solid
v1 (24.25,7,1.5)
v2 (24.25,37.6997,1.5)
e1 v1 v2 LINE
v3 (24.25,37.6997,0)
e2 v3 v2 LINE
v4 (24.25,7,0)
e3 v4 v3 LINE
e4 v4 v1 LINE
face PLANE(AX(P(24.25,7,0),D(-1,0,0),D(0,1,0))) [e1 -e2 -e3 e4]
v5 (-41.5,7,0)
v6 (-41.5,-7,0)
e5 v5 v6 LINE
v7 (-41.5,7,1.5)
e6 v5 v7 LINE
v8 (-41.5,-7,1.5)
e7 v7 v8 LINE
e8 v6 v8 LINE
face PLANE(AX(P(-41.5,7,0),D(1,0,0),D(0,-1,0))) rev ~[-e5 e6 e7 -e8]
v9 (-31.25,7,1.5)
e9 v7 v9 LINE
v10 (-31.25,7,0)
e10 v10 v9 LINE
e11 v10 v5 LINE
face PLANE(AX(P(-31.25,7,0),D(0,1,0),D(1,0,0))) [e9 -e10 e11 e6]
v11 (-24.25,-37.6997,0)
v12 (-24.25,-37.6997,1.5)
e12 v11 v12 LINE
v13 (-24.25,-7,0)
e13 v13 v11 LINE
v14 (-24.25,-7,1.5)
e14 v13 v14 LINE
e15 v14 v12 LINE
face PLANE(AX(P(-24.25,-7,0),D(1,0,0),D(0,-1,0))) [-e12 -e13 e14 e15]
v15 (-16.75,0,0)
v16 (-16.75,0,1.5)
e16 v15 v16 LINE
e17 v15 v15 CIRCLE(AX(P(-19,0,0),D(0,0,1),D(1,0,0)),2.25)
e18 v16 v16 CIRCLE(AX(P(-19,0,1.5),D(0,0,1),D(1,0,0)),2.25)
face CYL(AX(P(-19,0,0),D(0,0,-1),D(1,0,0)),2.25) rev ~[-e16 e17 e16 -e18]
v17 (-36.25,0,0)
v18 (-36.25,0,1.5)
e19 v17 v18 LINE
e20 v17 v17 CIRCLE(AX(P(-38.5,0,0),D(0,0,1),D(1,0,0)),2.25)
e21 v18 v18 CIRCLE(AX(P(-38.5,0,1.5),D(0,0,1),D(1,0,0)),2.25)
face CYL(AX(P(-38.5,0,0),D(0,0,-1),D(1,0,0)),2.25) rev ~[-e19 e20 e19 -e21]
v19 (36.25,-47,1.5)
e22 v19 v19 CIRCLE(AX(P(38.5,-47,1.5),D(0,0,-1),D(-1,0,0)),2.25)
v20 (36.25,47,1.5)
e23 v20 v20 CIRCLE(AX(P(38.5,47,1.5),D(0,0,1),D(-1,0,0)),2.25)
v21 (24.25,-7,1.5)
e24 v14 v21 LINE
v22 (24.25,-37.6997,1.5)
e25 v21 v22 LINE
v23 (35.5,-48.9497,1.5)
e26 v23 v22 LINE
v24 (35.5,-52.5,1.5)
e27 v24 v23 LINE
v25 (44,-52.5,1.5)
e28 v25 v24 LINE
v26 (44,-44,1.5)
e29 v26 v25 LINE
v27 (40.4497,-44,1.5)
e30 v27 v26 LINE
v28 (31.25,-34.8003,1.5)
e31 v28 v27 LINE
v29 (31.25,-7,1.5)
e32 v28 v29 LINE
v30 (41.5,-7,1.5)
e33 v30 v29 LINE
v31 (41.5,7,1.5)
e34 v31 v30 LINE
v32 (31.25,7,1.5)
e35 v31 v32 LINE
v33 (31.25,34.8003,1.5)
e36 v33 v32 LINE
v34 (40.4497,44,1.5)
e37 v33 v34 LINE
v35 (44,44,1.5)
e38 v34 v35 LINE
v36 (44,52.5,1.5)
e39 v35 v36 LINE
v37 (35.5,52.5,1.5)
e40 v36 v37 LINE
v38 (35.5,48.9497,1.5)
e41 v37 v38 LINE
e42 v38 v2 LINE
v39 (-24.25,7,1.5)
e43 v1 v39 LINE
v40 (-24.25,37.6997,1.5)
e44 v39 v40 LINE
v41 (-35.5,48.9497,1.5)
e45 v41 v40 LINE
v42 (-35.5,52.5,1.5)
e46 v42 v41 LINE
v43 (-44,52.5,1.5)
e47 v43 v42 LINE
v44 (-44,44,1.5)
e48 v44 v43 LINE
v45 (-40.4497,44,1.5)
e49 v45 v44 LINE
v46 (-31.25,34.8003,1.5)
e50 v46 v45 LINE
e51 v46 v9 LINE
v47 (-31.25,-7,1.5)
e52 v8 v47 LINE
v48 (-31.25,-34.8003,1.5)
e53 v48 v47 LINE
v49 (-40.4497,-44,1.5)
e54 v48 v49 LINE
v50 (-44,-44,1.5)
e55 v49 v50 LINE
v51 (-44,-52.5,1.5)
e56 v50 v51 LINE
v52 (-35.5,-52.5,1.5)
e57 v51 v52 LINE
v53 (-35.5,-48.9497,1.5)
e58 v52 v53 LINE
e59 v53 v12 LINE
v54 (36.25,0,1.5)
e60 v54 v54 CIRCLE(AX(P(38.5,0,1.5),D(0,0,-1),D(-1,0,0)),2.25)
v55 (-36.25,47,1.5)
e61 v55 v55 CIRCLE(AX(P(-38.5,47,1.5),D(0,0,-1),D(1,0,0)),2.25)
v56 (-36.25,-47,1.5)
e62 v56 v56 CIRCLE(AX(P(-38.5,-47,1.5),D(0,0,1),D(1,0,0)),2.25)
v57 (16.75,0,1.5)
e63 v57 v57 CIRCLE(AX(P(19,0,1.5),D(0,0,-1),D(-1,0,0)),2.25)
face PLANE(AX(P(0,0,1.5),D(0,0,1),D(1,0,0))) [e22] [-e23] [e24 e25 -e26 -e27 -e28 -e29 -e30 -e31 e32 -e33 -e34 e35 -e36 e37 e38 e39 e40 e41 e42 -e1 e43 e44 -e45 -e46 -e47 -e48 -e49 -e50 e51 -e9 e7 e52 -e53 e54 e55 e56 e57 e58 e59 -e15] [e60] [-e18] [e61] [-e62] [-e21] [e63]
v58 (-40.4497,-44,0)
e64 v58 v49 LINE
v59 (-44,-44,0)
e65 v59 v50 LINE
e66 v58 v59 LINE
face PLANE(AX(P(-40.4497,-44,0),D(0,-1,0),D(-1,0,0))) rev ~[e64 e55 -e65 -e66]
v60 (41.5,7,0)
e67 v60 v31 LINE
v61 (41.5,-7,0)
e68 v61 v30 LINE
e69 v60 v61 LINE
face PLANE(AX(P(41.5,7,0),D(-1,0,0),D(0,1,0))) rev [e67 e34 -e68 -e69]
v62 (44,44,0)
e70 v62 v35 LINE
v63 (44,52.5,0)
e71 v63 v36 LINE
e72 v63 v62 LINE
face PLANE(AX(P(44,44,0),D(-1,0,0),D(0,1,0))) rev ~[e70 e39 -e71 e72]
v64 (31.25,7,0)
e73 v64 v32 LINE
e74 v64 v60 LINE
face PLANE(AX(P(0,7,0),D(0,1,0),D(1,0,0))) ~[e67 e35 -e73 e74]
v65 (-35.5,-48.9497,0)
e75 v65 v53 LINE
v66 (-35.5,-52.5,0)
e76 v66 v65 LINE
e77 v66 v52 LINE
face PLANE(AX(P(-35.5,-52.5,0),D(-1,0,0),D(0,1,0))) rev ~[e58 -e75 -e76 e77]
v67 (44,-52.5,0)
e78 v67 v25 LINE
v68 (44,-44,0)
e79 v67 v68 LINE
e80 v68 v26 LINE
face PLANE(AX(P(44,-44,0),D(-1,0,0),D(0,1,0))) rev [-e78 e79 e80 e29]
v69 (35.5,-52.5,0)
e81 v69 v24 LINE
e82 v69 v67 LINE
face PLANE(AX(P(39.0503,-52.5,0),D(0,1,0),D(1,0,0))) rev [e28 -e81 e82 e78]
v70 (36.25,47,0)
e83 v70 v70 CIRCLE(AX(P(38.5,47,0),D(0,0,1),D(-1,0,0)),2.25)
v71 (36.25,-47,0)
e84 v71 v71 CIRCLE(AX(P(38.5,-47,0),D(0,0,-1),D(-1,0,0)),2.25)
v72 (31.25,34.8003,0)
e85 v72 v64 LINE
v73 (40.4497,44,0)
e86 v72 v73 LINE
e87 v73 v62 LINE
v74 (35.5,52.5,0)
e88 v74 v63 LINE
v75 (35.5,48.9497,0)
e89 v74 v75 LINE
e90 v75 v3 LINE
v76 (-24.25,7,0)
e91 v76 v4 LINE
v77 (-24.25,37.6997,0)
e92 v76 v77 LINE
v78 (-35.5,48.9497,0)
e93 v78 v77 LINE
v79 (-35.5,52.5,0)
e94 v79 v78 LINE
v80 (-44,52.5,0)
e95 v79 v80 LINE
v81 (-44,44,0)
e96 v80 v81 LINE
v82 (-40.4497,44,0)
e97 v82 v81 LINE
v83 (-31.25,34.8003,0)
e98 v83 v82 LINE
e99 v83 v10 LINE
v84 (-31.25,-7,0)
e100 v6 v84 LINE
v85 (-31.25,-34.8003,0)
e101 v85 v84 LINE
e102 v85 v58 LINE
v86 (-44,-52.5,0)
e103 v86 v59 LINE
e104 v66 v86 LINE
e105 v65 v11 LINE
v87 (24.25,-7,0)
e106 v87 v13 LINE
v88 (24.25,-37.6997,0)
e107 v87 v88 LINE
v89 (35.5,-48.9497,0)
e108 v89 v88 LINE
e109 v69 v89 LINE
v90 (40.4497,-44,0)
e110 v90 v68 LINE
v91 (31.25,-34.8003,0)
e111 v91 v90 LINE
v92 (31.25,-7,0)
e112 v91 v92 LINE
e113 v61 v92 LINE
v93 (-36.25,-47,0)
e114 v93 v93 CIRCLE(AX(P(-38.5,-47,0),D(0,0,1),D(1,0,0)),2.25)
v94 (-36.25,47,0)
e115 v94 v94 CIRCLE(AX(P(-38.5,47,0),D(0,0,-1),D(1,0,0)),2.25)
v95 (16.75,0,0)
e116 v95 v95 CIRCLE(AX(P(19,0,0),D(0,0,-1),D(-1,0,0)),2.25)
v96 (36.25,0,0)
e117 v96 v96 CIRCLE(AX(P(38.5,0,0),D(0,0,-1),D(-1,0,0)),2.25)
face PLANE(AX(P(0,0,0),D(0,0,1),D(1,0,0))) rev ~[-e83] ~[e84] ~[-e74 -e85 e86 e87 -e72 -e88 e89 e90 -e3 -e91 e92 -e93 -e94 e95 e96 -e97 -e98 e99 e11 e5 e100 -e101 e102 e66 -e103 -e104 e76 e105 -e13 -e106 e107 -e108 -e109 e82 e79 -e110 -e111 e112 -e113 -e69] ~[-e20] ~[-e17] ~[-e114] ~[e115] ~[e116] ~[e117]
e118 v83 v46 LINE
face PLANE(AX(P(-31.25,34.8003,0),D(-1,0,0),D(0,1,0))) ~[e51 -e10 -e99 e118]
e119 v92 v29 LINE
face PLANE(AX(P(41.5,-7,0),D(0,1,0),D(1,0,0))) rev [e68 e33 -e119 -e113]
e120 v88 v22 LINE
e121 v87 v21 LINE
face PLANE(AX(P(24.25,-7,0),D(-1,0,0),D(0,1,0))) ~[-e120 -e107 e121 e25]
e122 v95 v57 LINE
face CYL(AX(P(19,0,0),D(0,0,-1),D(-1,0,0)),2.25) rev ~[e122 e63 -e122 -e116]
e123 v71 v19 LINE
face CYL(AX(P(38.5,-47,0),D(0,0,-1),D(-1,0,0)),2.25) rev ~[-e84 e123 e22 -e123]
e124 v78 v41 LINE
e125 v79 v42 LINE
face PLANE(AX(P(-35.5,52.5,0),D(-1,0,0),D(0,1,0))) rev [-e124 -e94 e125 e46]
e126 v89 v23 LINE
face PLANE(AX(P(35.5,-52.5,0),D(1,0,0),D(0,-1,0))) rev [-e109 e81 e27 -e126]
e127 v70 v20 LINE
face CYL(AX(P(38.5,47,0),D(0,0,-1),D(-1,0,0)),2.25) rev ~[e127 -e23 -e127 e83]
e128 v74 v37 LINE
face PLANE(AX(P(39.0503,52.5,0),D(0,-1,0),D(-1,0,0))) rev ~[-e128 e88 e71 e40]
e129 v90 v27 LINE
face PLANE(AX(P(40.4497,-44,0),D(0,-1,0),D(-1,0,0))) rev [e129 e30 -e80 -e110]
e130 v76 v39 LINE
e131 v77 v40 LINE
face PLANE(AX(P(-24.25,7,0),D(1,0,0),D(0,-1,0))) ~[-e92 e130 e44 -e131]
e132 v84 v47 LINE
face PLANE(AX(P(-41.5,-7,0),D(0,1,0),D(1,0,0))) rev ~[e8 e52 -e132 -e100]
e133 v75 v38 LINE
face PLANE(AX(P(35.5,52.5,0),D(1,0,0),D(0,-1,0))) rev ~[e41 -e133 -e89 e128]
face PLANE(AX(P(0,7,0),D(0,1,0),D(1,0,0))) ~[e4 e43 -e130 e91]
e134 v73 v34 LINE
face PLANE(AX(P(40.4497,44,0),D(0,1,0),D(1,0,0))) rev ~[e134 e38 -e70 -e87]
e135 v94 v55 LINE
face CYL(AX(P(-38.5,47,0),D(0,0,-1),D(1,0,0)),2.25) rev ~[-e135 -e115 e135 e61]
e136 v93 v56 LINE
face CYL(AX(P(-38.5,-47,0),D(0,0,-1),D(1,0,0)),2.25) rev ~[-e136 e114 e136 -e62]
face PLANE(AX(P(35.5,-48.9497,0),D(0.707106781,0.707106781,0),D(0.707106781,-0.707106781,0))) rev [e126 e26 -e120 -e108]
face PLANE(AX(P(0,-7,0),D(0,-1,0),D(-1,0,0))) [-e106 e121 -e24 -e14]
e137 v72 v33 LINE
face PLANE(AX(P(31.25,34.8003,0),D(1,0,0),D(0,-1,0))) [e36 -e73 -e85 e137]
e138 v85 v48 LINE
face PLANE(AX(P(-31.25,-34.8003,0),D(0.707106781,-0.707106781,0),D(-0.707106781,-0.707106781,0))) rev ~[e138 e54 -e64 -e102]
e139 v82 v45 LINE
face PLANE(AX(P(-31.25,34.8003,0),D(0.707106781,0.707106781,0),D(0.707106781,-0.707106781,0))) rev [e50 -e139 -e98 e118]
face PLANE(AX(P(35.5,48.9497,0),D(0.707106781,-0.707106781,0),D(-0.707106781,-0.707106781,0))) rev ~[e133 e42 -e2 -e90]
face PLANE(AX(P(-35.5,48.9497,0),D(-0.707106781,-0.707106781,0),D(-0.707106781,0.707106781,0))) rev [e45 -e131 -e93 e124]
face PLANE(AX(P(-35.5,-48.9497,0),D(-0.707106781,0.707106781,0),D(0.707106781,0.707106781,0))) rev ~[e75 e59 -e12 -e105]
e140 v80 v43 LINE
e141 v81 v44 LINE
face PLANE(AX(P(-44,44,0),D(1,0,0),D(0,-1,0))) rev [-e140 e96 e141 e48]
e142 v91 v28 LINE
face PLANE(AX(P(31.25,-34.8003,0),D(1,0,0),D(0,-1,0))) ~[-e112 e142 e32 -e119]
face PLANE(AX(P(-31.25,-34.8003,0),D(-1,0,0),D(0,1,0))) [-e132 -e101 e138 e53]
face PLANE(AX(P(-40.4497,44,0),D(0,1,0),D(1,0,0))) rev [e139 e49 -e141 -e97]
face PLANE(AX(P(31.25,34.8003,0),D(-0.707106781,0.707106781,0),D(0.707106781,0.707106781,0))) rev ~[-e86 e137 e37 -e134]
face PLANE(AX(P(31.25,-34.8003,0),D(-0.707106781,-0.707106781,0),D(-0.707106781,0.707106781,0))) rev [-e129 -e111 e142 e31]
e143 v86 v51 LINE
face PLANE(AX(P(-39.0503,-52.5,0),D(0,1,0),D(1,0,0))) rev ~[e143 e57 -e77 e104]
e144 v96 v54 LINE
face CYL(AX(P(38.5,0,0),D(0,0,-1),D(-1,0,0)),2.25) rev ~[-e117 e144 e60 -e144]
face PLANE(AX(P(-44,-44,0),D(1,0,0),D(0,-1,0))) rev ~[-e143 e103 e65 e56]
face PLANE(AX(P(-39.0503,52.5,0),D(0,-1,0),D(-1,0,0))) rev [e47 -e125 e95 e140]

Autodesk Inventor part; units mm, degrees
ref_plane "YZ Plane" through (0, 0, 0) normal (1, 0, 0) x (0, 1, 0)
ref_plane "XZ Plane" through (0, 0, 0) normal (0, 1, 0) x (-1, 0, 0)
ref_plane "XY Plane" through (0, 0, 0) normal (0, 0, 1) x (1, 0, 0)
sketch "Sketch1" plane through (0, 0, 0) normal (0, 0, 1) x (1, 0, 0)
  line L0 (-41.5, 50) -> (41.5, 50) construction
  line L1 (41.5, 50) -> (41.5, -50) construction
  line L2 (41.5, -50) -> (-41.5, -50) construction
  line L3 (-41.5, -50) -> (-41.5, 50) construction
  line L4 (0, 52.1292) -> (0, -48.3366) construction
  line L5 (-75.7124, 0) -> (96.9256, 0) construction
  circle A0 centre (-38.5, 47) radius 2.25
  line L6 (-31.25, 7) -> (0, 7)
  line L7 (0, 7) -> (0, -7)
  line L8 (0, -7) -> (-31.25, -7)
  line L9 (-31.25, -7) -> (-31.25, 7)
  circle A1 centre (-19, 0) radius 2.25
  line L10 (38.5, 47) -> (-38.5, 47) construction
  line L11 (-38.5, 47) -> (-38.5, -47) construction
  line L12 (-38.5, -47) -> (38.5, -47) construction
  line L13 (38.5, -47) -> (38.5, 47) construction
  circle A2 centre (38.5, 47) radius 2.25
  circle A3 centre (38.5, -47) radius 2.25
  circle A4 centre (-38.5, -47) radius 2.25
  line L14 (-31.25, -7) -> (-24.25, -7)
  line L15 (-24.25, -7) -> (-24.25, -37.6997)
  line L16 (-24.25, -37.6997) -> (-31.25, -37.6997)
  line L17 (-31.25, -37.6997) -> (-31.25, -7)
  line L18 (-44, -47.5503) -> (-39.0503, -52.5)
  line L19 (-39.0503, -52.5) -> (-24.25, -37.6997)
  line L20 (-24.25, -37.6997) -> (-29.1997, -32.75)
  line L21 (-29.1997, -32.75) -> (-44, -47.5503)
  line L22 (-26.7249, -35.2249) -> (-41.5251, -50.0251) construction
  line L23 (-41.5, -50) -> (-10.8193, -19.3193) construction
  line L24 (-41.5, -50) -> (1.8891, -50) construction
  line L25 (-35.5, -44) -> (-44, -44)
  line L26 (-44, -44) -> (-44, -52.5)
  line L27 (-44, -52.5) -> (-35.5, -52.5)
  line L28 (-35.5, -52.5) -> (-35.5, -44)
  circle A5 centre (-38.5, 0) radius 2.25
  line L29 (-31.25, 7) -> (-41.5, 7)
  line L30 (-41.5, 7) -> (-41.5, -7)
  line L31 (-41.5, -7) -> (-31.25, -7)
  line L32 (-31.25, -7) -> (-31.25, 7)
  point P0 (0, 0)
  point P1 (41.5, 0)
  point P2 (0, 50)
  dimension "d0" = 83
  dimension "d3" = 4.5
  dimension "d5" = 3
  dimension "d9" = 14
  dimension "d10" = 4.5
  dimension "d11" = 19
  dimension "d14" = 100
  dimension "d16" = 3
  dimension "d17" = 4.5
  dimension "d18" = 4.5
  dimension "d19" = 4.5
  dimension "d20" = 7
  dimension "d21" = 7
  dimension "d22" = 45
  dimension "d23" = 3
  dimension "d24" = 5.5
  dimension "d25" = 5.5
  dimension "d26" = 3
  dimension "d27" = 3
  dimension "d28" = 4.5
extrude "Extrusion1" add sketch "Sketch1" along normal blind 1.5 contours L6 L7 L8 L9 | L9 L31 L30 L29 | L8 L15 L20 L21 L17 | L21 L20 L16 L17 | L17 L16 L19 L28 L25 L21 | L25 L28 L19 L18 L21 | L21 L26 L25 | L28 L27 L19 | L18 L27 L26
mirror "Mirror1" about plane through (0, 0, 0) normal (1, 0, 0) of "Extrusion1"
mirror "Mirror2" about plane through (0, 0, 0) normal (0, 1, 0) of "Extrusion1", "Mirror1"
properties part number "MotorSideHolder"
